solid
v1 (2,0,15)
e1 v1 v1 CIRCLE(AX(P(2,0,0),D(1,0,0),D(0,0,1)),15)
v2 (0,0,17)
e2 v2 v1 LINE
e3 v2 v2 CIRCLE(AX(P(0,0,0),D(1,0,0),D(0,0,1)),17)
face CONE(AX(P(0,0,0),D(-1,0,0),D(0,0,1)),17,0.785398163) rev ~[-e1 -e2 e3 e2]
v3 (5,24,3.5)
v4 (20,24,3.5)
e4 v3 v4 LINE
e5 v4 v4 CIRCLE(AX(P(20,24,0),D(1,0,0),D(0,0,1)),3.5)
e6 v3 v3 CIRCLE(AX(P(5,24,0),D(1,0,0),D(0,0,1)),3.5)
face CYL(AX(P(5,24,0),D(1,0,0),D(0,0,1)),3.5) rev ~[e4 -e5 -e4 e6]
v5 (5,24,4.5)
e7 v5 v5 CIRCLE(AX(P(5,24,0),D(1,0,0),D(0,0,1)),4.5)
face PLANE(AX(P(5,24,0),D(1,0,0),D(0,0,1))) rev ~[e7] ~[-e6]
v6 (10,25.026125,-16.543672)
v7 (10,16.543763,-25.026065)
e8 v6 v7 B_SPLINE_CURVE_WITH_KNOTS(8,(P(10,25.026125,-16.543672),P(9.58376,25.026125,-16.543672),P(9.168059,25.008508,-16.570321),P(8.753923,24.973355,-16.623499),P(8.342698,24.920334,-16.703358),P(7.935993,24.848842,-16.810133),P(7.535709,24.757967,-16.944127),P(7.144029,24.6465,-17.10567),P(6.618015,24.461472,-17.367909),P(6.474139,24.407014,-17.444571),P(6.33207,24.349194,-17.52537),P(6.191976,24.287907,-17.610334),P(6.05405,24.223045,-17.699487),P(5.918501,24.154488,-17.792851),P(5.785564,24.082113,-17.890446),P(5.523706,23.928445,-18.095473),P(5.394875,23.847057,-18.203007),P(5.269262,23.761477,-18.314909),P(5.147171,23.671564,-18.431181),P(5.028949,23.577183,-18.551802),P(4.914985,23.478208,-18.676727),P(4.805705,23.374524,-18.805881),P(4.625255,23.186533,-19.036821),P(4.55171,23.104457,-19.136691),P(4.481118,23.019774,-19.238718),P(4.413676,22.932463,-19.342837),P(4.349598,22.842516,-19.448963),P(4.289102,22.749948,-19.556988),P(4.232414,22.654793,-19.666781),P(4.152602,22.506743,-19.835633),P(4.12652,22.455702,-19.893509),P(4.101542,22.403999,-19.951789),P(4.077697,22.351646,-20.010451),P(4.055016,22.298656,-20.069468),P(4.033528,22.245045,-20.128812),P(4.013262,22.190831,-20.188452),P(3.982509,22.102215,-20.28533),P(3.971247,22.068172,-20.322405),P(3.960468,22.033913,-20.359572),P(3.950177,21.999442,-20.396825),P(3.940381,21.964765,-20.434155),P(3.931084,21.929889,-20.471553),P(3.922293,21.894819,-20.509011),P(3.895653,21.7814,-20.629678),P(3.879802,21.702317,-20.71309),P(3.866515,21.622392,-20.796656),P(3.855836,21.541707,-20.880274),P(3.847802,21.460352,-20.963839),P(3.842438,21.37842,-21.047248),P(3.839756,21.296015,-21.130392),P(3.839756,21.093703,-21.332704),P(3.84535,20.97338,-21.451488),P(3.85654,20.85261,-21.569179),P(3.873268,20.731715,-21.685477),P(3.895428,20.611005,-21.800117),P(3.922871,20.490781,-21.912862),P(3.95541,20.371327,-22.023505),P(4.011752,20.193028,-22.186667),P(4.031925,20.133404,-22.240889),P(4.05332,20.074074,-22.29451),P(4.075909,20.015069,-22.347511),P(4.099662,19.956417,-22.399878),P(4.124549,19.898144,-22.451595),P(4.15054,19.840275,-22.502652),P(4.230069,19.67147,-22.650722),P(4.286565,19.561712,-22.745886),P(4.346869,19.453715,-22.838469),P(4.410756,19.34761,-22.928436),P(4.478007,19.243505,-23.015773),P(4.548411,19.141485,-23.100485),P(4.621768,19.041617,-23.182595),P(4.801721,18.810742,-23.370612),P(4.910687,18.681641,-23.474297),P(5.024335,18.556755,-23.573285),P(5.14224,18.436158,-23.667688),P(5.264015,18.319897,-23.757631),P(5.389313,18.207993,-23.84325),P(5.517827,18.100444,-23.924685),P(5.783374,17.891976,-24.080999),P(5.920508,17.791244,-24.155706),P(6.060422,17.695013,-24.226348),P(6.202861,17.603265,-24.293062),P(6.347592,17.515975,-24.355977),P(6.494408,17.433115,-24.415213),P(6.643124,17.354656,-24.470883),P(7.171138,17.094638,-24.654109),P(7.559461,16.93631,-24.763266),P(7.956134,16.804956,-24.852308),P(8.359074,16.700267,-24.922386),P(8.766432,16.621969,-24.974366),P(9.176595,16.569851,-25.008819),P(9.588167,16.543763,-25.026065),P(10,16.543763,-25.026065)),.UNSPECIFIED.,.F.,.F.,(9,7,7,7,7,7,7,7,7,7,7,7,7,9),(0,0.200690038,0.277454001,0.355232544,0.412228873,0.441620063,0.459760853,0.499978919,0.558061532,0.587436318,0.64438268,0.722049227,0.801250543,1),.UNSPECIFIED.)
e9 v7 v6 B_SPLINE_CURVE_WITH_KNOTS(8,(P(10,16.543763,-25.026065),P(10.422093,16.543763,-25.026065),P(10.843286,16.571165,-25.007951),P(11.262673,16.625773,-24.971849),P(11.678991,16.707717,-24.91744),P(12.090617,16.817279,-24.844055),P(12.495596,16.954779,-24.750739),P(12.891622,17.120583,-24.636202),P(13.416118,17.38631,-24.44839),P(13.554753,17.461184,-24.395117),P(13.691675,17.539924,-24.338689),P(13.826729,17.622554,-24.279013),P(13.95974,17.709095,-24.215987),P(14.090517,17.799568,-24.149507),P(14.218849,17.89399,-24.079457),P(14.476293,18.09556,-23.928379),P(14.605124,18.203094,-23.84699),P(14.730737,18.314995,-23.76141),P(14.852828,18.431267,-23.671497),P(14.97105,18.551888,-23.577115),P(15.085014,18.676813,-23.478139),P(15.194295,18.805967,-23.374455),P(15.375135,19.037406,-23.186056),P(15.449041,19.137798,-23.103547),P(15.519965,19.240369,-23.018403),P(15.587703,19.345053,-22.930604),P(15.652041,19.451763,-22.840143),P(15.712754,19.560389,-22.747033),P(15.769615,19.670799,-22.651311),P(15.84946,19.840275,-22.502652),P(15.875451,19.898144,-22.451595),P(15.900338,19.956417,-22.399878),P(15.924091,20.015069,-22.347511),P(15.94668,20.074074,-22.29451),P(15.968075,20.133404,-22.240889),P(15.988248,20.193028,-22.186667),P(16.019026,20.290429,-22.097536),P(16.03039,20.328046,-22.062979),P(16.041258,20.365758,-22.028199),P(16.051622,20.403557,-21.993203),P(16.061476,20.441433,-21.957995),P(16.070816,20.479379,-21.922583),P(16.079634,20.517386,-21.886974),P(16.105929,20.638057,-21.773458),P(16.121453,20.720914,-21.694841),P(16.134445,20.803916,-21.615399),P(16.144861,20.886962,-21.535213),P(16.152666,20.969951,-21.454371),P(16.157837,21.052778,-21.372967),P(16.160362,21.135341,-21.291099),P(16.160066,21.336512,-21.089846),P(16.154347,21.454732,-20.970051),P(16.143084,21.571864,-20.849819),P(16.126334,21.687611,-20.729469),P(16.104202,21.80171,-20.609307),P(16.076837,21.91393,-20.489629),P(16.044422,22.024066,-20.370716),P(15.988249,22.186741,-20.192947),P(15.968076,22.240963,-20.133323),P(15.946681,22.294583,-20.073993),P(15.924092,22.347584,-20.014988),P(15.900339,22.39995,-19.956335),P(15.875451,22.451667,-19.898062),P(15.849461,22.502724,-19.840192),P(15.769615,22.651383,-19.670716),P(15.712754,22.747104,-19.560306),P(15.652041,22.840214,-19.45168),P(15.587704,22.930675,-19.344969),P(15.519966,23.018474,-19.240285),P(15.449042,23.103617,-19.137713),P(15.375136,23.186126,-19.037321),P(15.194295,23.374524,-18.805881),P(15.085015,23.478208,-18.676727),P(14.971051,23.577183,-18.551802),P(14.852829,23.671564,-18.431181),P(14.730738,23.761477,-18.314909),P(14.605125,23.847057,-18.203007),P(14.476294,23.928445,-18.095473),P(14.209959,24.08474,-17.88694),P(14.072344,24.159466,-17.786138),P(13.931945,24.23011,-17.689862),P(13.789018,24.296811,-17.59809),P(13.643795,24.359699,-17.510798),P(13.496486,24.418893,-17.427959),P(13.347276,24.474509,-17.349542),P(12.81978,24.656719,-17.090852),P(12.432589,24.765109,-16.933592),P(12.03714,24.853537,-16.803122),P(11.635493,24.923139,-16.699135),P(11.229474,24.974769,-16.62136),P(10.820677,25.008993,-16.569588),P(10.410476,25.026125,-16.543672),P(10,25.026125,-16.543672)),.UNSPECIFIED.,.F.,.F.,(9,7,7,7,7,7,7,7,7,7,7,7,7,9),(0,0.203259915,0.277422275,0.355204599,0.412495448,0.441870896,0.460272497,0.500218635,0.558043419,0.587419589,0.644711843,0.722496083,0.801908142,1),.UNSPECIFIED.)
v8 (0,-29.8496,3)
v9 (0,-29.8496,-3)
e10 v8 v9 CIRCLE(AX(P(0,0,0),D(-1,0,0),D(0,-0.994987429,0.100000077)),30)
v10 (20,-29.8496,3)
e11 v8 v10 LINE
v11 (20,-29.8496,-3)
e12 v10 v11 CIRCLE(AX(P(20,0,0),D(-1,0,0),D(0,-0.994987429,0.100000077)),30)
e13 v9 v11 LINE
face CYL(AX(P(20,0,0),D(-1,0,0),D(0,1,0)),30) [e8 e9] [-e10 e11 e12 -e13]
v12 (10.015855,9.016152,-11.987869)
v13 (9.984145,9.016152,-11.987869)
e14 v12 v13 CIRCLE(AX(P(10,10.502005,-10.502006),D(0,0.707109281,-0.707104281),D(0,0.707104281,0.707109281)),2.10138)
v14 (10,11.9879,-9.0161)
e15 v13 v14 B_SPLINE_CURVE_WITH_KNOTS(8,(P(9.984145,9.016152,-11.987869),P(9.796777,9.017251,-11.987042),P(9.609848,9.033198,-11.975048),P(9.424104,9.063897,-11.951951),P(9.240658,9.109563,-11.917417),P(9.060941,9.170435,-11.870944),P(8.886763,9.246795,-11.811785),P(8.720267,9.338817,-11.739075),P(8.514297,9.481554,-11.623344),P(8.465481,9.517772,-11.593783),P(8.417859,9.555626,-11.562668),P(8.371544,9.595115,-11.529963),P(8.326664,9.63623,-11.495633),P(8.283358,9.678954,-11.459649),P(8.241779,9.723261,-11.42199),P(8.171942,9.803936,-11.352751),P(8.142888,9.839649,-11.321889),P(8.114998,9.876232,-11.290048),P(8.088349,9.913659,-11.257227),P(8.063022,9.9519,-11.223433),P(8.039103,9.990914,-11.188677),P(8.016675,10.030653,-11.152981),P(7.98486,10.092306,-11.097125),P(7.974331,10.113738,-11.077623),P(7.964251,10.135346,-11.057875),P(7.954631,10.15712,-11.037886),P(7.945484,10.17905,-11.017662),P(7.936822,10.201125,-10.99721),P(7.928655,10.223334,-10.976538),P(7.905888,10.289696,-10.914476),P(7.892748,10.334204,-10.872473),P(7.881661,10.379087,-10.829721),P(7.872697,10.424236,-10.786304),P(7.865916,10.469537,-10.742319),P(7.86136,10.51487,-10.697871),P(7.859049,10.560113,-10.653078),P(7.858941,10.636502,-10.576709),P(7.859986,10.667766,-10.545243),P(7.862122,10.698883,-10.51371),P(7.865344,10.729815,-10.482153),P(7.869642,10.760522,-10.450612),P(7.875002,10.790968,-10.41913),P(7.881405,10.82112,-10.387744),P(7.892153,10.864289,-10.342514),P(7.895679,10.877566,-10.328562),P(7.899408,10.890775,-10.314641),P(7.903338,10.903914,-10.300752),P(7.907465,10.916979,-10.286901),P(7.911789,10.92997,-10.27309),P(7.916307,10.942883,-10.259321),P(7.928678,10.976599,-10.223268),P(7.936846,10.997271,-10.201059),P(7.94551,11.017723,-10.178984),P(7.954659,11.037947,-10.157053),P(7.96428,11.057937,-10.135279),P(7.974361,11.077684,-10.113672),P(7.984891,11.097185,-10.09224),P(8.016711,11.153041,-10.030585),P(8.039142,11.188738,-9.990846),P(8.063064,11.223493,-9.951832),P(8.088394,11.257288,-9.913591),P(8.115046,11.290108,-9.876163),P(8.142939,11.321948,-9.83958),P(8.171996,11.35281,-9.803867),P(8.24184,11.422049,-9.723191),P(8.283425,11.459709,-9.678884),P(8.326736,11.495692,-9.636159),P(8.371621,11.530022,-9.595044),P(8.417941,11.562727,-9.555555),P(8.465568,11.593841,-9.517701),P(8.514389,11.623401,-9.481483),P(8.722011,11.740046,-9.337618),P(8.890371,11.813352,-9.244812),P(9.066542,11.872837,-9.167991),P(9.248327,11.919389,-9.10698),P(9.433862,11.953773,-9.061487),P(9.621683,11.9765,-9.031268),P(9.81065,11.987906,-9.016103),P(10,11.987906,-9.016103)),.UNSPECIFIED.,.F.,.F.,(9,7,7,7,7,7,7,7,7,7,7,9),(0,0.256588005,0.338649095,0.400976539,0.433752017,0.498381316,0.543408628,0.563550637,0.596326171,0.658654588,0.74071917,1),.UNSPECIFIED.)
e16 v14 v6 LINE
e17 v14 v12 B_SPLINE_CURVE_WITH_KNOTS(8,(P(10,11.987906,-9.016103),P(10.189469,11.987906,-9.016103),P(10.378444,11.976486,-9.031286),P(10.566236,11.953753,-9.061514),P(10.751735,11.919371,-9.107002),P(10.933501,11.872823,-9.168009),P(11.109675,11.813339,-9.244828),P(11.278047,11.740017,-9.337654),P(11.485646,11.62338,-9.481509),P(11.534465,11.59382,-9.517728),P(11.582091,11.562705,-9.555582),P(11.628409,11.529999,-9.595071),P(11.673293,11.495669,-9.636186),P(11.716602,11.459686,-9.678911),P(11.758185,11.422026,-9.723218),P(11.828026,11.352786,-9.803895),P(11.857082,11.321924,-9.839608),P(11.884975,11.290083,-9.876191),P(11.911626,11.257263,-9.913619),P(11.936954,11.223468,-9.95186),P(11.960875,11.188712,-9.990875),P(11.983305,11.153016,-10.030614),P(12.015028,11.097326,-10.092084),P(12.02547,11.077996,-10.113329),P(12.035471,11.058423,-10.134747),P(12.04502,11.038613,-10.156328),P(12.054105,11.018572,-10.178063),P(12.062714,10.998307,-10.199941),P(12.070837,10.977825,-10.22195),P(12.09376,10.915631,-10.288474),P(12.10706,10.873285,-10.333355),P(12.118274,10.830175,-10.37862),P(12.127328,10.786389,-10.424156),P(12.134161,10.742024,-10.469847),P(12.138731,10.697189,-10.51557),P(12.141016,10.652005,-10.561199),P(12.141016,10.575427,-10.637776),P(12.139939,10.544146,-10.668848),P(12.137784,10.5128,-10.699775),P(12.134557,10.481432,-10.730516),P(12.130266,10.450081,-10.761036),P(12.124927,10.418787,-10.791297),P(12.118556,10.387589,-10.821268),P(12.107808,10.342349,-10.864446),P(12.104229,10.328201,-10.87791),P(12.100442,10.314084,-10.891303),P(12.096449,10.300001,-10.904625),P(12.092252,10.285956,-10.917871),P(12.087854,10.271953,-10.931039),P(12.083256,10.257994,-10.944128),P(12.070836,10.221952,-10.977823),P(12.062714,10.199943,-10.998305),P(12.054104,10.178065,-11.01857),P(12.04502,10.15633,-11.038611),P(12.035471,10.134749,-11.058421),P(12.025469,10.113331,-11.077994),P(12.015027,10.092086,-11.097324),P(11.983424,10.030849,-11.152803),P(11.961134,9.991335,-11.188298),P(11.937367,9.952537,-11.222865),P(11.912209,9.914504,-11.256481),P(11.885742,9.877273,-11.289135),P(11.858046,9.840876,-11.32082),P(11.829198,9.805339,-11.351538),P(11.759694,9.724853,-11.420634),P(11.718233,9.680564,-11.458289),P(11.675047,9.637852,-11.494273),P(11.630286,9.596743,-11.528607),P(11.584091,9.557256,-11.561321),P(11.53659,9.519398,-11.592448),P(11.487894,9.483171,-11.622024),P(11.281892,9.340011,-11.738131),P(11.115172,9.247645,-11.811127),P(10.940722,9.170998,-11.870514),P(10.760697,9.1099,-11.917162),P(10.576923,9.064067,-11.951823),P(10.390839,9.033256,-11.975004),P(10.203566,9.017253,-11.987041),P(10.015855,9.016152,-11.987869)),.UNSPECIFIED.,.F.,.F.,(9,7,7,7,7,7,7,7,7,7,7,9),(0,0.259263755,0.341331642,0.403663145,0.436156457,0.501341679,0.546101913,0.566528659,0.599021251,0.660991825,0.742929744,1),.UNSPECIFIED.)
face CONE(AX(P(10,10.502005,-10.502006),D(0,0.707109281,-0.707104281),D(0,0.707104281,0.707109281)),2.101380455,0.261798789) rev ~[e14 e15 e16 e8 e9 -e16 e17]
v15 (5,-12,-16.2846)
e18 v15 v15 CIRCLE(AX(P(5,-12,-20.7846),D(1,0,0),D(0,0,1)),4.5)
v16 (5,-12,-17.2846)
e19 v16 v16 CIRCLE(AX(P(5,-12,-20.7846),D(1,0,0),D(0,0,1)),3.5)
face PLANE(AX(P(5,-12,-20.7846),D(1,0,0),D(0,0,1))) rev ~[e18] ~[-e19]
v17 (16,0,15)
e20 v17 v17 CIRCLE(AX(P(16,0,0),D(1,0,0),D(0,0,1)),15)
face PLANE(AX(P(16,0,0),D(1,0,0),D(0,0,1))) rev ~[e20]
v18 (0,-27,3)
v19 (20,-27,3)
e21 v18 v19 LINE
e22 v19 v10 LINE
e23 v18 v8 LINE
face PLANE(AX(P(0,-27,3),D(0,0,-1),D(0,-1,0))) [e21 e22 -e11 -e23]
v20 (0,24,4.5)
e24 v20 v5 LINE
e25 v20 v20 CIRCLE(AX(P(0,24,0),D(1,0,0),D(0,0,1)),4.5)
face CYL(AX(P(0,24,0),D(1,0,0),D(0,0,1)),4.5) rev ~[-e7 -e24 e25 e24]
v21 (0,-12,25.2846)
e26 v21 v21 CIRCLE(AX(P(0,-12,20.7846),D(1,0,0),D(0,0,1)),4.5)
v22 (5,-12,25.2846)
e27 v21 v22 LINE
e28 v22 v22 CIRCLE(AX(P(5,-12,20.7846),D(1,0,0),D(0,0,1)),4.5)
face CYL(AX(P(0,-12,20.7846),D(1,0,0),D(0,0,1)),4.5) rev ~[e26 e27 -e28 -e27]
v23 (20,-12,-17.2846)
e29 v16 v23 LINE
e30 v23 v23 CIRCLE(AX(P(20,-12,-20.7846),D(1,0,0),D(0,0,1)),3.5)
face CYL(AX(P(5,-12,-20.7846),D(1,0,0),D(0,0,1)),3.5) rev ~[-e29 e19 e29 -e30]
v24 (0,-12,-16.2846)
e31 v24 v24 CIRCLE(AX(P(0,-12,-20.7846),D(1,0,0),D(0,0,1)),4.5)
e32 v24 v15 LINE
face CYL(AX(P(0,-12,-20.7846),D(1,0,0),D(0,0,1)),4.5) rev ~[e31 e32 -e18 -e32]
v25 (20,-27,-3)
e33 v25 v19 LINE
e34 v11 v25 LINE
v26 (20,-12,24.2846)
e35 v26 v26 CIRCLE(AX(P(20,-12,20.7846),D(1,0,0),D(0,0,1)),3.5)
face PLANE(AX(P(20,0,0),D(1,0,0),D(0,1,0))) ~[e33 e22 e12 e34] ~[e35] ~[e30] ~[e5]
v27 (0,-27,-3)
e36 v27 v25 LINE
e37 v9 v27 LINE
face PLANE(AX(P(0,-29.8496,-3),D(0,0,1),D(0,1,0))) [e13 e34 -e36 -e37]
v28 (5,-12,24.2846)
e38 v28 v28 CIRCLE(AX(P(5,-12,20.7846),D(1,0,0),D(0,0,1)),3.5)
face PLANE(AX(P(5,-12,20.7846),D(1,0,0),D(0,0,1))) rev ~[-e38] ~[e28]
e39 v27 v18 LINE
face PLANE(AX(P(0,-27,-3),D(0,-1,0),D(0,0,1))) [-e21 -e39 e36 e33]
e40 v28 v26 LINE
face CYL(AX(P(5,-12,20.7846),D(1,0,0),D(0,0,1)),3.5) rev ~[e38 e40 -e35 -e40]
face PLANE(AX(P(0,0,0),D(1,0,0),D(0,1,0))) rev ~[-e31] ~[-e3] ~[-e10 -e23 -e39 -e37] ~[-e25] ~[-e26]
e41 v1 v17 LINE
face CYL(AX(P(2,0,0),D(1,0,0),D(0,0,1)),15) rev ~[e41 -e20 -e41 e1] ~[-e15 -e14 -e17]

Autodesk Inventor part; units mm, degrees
ref_plane "YZ Plane" through (0, 0, 0) normal (1, 0, 0) x (0, 1, 0)
ref_plane "XZ Plane" through (0, 0, 0) normal (0, 1, 0) x (-1, 0, 0)
sketch "Эскиз1" plane through (0, 0, 0) normal (0, 0, 1) x (1, 0, 0)
  line L0 (0, 0) -> (20, 0)
  line L1 (20, 0) -> (20, 30)
  line L2 (20, 30) -> (0, 30)
  line L3 (0, 30) -> (0, 0)
  dimension "d0" = 20
  dimension "d1" = 30
revolve "Вращение1" add sketch "Эскиз1" angle 360 about axis through (0, 0, 0) along (1, 0, 0)
sketch "Эскиз2" plane through (0, 0, 0) normal (-1, 0, 0) x (0, 0, 1)
  point P0 (0, 0)
  point P1 (0, 24)
  point P2 (-20.7846, -12)
  point P3 (20.7846, -12)
  dimension "d3" = 24
  dimension "d6" = 360
hole "Отверстие1" at (0, 24, 0) at (0, -12, -20.7846) at (0, -12, 20.7846) direction (1, 0, 0) diameter 7 end through all counterbore diameter 9 counterbore depth 5
sketch "Эскиз3" plane through (0, 0, 0) normal (-1, 0, 0) x (0, 0, 1)
  point P0 (0, 0)
  point P1 (0, 0)
hole "Отверстие2" at (0, 0, 0) direction (1, 0, 0) diameter 30 depth 16 countersink diameter 34 countersink angle 90
sketch "Эскиз4" plane through (0, 0, 0) normal (-1, 0, 0) x (0, 0, 1)
  circle A0 centre (0, 0) radius 30 construction
  line L0 (-3, -27) -> (3, -27)
  line L1 (3, -27) -> (3, -29.8496)
  line L2 (-3, -29.8496) -> (-3, -27)
  arc A1 (-3, -29.8496) -> (3, -29.8496) centre (0, 0) ccw
  point P0 (0, -27)
  dimension "d22" = 6
  dimension "d23" = 27
extrude "Выдавливание1" cut sketch "Эскиз4" against normal blind 20
ref_plane "РабПлоскость1" through (10, -29.8496, -3) normal (-1, 0, 0) x (0, 0, 1)
sketch "Эскиз5" plane through (10, -29.8496, -3) normal (-1, 0, 0) x (0, 0, 1)
  line L0 (3, 29.8496) -> (-21.7487, 54.5984) construction
  line L1 (3, 29.8496) -> (33, 29.8496) construction
  arc A0 (6, 0) -> (0, 0) centre (3, 29.8496) ccw construction
  circle A1 centre (3, 29.8496) radius 15 construction
  arc A2 (-6.0161, 41.8375) -> (-8.9879, 38.8657) centre (3, 29.8496) ccw
  line L2 (-7.6066, 40.4562) -> (-21.7487, 54.5984)
  line L3 (-6.0161, 41.8375) -> (-16.4454, 59.9017)
  line L4 (-8.9879, 38.8657) -> (-27.052, 49.2951)
  line L5 (-27.052, 49.2951) -> (-16.4454, 59.9017)
  dimension "d27" = 135
  dimension "d32" = 15
  dimension "d33" = 15
  dimension "d34" = 20
  dimension "d35" = 15
revolve "Вращение3" cut sketch "Эскиз5" angle 360 about axis through (10, 0, 0) along (0, 0.7071068, -0.7071068) contours A2 L2 L5 L3
properties part number "711124"
